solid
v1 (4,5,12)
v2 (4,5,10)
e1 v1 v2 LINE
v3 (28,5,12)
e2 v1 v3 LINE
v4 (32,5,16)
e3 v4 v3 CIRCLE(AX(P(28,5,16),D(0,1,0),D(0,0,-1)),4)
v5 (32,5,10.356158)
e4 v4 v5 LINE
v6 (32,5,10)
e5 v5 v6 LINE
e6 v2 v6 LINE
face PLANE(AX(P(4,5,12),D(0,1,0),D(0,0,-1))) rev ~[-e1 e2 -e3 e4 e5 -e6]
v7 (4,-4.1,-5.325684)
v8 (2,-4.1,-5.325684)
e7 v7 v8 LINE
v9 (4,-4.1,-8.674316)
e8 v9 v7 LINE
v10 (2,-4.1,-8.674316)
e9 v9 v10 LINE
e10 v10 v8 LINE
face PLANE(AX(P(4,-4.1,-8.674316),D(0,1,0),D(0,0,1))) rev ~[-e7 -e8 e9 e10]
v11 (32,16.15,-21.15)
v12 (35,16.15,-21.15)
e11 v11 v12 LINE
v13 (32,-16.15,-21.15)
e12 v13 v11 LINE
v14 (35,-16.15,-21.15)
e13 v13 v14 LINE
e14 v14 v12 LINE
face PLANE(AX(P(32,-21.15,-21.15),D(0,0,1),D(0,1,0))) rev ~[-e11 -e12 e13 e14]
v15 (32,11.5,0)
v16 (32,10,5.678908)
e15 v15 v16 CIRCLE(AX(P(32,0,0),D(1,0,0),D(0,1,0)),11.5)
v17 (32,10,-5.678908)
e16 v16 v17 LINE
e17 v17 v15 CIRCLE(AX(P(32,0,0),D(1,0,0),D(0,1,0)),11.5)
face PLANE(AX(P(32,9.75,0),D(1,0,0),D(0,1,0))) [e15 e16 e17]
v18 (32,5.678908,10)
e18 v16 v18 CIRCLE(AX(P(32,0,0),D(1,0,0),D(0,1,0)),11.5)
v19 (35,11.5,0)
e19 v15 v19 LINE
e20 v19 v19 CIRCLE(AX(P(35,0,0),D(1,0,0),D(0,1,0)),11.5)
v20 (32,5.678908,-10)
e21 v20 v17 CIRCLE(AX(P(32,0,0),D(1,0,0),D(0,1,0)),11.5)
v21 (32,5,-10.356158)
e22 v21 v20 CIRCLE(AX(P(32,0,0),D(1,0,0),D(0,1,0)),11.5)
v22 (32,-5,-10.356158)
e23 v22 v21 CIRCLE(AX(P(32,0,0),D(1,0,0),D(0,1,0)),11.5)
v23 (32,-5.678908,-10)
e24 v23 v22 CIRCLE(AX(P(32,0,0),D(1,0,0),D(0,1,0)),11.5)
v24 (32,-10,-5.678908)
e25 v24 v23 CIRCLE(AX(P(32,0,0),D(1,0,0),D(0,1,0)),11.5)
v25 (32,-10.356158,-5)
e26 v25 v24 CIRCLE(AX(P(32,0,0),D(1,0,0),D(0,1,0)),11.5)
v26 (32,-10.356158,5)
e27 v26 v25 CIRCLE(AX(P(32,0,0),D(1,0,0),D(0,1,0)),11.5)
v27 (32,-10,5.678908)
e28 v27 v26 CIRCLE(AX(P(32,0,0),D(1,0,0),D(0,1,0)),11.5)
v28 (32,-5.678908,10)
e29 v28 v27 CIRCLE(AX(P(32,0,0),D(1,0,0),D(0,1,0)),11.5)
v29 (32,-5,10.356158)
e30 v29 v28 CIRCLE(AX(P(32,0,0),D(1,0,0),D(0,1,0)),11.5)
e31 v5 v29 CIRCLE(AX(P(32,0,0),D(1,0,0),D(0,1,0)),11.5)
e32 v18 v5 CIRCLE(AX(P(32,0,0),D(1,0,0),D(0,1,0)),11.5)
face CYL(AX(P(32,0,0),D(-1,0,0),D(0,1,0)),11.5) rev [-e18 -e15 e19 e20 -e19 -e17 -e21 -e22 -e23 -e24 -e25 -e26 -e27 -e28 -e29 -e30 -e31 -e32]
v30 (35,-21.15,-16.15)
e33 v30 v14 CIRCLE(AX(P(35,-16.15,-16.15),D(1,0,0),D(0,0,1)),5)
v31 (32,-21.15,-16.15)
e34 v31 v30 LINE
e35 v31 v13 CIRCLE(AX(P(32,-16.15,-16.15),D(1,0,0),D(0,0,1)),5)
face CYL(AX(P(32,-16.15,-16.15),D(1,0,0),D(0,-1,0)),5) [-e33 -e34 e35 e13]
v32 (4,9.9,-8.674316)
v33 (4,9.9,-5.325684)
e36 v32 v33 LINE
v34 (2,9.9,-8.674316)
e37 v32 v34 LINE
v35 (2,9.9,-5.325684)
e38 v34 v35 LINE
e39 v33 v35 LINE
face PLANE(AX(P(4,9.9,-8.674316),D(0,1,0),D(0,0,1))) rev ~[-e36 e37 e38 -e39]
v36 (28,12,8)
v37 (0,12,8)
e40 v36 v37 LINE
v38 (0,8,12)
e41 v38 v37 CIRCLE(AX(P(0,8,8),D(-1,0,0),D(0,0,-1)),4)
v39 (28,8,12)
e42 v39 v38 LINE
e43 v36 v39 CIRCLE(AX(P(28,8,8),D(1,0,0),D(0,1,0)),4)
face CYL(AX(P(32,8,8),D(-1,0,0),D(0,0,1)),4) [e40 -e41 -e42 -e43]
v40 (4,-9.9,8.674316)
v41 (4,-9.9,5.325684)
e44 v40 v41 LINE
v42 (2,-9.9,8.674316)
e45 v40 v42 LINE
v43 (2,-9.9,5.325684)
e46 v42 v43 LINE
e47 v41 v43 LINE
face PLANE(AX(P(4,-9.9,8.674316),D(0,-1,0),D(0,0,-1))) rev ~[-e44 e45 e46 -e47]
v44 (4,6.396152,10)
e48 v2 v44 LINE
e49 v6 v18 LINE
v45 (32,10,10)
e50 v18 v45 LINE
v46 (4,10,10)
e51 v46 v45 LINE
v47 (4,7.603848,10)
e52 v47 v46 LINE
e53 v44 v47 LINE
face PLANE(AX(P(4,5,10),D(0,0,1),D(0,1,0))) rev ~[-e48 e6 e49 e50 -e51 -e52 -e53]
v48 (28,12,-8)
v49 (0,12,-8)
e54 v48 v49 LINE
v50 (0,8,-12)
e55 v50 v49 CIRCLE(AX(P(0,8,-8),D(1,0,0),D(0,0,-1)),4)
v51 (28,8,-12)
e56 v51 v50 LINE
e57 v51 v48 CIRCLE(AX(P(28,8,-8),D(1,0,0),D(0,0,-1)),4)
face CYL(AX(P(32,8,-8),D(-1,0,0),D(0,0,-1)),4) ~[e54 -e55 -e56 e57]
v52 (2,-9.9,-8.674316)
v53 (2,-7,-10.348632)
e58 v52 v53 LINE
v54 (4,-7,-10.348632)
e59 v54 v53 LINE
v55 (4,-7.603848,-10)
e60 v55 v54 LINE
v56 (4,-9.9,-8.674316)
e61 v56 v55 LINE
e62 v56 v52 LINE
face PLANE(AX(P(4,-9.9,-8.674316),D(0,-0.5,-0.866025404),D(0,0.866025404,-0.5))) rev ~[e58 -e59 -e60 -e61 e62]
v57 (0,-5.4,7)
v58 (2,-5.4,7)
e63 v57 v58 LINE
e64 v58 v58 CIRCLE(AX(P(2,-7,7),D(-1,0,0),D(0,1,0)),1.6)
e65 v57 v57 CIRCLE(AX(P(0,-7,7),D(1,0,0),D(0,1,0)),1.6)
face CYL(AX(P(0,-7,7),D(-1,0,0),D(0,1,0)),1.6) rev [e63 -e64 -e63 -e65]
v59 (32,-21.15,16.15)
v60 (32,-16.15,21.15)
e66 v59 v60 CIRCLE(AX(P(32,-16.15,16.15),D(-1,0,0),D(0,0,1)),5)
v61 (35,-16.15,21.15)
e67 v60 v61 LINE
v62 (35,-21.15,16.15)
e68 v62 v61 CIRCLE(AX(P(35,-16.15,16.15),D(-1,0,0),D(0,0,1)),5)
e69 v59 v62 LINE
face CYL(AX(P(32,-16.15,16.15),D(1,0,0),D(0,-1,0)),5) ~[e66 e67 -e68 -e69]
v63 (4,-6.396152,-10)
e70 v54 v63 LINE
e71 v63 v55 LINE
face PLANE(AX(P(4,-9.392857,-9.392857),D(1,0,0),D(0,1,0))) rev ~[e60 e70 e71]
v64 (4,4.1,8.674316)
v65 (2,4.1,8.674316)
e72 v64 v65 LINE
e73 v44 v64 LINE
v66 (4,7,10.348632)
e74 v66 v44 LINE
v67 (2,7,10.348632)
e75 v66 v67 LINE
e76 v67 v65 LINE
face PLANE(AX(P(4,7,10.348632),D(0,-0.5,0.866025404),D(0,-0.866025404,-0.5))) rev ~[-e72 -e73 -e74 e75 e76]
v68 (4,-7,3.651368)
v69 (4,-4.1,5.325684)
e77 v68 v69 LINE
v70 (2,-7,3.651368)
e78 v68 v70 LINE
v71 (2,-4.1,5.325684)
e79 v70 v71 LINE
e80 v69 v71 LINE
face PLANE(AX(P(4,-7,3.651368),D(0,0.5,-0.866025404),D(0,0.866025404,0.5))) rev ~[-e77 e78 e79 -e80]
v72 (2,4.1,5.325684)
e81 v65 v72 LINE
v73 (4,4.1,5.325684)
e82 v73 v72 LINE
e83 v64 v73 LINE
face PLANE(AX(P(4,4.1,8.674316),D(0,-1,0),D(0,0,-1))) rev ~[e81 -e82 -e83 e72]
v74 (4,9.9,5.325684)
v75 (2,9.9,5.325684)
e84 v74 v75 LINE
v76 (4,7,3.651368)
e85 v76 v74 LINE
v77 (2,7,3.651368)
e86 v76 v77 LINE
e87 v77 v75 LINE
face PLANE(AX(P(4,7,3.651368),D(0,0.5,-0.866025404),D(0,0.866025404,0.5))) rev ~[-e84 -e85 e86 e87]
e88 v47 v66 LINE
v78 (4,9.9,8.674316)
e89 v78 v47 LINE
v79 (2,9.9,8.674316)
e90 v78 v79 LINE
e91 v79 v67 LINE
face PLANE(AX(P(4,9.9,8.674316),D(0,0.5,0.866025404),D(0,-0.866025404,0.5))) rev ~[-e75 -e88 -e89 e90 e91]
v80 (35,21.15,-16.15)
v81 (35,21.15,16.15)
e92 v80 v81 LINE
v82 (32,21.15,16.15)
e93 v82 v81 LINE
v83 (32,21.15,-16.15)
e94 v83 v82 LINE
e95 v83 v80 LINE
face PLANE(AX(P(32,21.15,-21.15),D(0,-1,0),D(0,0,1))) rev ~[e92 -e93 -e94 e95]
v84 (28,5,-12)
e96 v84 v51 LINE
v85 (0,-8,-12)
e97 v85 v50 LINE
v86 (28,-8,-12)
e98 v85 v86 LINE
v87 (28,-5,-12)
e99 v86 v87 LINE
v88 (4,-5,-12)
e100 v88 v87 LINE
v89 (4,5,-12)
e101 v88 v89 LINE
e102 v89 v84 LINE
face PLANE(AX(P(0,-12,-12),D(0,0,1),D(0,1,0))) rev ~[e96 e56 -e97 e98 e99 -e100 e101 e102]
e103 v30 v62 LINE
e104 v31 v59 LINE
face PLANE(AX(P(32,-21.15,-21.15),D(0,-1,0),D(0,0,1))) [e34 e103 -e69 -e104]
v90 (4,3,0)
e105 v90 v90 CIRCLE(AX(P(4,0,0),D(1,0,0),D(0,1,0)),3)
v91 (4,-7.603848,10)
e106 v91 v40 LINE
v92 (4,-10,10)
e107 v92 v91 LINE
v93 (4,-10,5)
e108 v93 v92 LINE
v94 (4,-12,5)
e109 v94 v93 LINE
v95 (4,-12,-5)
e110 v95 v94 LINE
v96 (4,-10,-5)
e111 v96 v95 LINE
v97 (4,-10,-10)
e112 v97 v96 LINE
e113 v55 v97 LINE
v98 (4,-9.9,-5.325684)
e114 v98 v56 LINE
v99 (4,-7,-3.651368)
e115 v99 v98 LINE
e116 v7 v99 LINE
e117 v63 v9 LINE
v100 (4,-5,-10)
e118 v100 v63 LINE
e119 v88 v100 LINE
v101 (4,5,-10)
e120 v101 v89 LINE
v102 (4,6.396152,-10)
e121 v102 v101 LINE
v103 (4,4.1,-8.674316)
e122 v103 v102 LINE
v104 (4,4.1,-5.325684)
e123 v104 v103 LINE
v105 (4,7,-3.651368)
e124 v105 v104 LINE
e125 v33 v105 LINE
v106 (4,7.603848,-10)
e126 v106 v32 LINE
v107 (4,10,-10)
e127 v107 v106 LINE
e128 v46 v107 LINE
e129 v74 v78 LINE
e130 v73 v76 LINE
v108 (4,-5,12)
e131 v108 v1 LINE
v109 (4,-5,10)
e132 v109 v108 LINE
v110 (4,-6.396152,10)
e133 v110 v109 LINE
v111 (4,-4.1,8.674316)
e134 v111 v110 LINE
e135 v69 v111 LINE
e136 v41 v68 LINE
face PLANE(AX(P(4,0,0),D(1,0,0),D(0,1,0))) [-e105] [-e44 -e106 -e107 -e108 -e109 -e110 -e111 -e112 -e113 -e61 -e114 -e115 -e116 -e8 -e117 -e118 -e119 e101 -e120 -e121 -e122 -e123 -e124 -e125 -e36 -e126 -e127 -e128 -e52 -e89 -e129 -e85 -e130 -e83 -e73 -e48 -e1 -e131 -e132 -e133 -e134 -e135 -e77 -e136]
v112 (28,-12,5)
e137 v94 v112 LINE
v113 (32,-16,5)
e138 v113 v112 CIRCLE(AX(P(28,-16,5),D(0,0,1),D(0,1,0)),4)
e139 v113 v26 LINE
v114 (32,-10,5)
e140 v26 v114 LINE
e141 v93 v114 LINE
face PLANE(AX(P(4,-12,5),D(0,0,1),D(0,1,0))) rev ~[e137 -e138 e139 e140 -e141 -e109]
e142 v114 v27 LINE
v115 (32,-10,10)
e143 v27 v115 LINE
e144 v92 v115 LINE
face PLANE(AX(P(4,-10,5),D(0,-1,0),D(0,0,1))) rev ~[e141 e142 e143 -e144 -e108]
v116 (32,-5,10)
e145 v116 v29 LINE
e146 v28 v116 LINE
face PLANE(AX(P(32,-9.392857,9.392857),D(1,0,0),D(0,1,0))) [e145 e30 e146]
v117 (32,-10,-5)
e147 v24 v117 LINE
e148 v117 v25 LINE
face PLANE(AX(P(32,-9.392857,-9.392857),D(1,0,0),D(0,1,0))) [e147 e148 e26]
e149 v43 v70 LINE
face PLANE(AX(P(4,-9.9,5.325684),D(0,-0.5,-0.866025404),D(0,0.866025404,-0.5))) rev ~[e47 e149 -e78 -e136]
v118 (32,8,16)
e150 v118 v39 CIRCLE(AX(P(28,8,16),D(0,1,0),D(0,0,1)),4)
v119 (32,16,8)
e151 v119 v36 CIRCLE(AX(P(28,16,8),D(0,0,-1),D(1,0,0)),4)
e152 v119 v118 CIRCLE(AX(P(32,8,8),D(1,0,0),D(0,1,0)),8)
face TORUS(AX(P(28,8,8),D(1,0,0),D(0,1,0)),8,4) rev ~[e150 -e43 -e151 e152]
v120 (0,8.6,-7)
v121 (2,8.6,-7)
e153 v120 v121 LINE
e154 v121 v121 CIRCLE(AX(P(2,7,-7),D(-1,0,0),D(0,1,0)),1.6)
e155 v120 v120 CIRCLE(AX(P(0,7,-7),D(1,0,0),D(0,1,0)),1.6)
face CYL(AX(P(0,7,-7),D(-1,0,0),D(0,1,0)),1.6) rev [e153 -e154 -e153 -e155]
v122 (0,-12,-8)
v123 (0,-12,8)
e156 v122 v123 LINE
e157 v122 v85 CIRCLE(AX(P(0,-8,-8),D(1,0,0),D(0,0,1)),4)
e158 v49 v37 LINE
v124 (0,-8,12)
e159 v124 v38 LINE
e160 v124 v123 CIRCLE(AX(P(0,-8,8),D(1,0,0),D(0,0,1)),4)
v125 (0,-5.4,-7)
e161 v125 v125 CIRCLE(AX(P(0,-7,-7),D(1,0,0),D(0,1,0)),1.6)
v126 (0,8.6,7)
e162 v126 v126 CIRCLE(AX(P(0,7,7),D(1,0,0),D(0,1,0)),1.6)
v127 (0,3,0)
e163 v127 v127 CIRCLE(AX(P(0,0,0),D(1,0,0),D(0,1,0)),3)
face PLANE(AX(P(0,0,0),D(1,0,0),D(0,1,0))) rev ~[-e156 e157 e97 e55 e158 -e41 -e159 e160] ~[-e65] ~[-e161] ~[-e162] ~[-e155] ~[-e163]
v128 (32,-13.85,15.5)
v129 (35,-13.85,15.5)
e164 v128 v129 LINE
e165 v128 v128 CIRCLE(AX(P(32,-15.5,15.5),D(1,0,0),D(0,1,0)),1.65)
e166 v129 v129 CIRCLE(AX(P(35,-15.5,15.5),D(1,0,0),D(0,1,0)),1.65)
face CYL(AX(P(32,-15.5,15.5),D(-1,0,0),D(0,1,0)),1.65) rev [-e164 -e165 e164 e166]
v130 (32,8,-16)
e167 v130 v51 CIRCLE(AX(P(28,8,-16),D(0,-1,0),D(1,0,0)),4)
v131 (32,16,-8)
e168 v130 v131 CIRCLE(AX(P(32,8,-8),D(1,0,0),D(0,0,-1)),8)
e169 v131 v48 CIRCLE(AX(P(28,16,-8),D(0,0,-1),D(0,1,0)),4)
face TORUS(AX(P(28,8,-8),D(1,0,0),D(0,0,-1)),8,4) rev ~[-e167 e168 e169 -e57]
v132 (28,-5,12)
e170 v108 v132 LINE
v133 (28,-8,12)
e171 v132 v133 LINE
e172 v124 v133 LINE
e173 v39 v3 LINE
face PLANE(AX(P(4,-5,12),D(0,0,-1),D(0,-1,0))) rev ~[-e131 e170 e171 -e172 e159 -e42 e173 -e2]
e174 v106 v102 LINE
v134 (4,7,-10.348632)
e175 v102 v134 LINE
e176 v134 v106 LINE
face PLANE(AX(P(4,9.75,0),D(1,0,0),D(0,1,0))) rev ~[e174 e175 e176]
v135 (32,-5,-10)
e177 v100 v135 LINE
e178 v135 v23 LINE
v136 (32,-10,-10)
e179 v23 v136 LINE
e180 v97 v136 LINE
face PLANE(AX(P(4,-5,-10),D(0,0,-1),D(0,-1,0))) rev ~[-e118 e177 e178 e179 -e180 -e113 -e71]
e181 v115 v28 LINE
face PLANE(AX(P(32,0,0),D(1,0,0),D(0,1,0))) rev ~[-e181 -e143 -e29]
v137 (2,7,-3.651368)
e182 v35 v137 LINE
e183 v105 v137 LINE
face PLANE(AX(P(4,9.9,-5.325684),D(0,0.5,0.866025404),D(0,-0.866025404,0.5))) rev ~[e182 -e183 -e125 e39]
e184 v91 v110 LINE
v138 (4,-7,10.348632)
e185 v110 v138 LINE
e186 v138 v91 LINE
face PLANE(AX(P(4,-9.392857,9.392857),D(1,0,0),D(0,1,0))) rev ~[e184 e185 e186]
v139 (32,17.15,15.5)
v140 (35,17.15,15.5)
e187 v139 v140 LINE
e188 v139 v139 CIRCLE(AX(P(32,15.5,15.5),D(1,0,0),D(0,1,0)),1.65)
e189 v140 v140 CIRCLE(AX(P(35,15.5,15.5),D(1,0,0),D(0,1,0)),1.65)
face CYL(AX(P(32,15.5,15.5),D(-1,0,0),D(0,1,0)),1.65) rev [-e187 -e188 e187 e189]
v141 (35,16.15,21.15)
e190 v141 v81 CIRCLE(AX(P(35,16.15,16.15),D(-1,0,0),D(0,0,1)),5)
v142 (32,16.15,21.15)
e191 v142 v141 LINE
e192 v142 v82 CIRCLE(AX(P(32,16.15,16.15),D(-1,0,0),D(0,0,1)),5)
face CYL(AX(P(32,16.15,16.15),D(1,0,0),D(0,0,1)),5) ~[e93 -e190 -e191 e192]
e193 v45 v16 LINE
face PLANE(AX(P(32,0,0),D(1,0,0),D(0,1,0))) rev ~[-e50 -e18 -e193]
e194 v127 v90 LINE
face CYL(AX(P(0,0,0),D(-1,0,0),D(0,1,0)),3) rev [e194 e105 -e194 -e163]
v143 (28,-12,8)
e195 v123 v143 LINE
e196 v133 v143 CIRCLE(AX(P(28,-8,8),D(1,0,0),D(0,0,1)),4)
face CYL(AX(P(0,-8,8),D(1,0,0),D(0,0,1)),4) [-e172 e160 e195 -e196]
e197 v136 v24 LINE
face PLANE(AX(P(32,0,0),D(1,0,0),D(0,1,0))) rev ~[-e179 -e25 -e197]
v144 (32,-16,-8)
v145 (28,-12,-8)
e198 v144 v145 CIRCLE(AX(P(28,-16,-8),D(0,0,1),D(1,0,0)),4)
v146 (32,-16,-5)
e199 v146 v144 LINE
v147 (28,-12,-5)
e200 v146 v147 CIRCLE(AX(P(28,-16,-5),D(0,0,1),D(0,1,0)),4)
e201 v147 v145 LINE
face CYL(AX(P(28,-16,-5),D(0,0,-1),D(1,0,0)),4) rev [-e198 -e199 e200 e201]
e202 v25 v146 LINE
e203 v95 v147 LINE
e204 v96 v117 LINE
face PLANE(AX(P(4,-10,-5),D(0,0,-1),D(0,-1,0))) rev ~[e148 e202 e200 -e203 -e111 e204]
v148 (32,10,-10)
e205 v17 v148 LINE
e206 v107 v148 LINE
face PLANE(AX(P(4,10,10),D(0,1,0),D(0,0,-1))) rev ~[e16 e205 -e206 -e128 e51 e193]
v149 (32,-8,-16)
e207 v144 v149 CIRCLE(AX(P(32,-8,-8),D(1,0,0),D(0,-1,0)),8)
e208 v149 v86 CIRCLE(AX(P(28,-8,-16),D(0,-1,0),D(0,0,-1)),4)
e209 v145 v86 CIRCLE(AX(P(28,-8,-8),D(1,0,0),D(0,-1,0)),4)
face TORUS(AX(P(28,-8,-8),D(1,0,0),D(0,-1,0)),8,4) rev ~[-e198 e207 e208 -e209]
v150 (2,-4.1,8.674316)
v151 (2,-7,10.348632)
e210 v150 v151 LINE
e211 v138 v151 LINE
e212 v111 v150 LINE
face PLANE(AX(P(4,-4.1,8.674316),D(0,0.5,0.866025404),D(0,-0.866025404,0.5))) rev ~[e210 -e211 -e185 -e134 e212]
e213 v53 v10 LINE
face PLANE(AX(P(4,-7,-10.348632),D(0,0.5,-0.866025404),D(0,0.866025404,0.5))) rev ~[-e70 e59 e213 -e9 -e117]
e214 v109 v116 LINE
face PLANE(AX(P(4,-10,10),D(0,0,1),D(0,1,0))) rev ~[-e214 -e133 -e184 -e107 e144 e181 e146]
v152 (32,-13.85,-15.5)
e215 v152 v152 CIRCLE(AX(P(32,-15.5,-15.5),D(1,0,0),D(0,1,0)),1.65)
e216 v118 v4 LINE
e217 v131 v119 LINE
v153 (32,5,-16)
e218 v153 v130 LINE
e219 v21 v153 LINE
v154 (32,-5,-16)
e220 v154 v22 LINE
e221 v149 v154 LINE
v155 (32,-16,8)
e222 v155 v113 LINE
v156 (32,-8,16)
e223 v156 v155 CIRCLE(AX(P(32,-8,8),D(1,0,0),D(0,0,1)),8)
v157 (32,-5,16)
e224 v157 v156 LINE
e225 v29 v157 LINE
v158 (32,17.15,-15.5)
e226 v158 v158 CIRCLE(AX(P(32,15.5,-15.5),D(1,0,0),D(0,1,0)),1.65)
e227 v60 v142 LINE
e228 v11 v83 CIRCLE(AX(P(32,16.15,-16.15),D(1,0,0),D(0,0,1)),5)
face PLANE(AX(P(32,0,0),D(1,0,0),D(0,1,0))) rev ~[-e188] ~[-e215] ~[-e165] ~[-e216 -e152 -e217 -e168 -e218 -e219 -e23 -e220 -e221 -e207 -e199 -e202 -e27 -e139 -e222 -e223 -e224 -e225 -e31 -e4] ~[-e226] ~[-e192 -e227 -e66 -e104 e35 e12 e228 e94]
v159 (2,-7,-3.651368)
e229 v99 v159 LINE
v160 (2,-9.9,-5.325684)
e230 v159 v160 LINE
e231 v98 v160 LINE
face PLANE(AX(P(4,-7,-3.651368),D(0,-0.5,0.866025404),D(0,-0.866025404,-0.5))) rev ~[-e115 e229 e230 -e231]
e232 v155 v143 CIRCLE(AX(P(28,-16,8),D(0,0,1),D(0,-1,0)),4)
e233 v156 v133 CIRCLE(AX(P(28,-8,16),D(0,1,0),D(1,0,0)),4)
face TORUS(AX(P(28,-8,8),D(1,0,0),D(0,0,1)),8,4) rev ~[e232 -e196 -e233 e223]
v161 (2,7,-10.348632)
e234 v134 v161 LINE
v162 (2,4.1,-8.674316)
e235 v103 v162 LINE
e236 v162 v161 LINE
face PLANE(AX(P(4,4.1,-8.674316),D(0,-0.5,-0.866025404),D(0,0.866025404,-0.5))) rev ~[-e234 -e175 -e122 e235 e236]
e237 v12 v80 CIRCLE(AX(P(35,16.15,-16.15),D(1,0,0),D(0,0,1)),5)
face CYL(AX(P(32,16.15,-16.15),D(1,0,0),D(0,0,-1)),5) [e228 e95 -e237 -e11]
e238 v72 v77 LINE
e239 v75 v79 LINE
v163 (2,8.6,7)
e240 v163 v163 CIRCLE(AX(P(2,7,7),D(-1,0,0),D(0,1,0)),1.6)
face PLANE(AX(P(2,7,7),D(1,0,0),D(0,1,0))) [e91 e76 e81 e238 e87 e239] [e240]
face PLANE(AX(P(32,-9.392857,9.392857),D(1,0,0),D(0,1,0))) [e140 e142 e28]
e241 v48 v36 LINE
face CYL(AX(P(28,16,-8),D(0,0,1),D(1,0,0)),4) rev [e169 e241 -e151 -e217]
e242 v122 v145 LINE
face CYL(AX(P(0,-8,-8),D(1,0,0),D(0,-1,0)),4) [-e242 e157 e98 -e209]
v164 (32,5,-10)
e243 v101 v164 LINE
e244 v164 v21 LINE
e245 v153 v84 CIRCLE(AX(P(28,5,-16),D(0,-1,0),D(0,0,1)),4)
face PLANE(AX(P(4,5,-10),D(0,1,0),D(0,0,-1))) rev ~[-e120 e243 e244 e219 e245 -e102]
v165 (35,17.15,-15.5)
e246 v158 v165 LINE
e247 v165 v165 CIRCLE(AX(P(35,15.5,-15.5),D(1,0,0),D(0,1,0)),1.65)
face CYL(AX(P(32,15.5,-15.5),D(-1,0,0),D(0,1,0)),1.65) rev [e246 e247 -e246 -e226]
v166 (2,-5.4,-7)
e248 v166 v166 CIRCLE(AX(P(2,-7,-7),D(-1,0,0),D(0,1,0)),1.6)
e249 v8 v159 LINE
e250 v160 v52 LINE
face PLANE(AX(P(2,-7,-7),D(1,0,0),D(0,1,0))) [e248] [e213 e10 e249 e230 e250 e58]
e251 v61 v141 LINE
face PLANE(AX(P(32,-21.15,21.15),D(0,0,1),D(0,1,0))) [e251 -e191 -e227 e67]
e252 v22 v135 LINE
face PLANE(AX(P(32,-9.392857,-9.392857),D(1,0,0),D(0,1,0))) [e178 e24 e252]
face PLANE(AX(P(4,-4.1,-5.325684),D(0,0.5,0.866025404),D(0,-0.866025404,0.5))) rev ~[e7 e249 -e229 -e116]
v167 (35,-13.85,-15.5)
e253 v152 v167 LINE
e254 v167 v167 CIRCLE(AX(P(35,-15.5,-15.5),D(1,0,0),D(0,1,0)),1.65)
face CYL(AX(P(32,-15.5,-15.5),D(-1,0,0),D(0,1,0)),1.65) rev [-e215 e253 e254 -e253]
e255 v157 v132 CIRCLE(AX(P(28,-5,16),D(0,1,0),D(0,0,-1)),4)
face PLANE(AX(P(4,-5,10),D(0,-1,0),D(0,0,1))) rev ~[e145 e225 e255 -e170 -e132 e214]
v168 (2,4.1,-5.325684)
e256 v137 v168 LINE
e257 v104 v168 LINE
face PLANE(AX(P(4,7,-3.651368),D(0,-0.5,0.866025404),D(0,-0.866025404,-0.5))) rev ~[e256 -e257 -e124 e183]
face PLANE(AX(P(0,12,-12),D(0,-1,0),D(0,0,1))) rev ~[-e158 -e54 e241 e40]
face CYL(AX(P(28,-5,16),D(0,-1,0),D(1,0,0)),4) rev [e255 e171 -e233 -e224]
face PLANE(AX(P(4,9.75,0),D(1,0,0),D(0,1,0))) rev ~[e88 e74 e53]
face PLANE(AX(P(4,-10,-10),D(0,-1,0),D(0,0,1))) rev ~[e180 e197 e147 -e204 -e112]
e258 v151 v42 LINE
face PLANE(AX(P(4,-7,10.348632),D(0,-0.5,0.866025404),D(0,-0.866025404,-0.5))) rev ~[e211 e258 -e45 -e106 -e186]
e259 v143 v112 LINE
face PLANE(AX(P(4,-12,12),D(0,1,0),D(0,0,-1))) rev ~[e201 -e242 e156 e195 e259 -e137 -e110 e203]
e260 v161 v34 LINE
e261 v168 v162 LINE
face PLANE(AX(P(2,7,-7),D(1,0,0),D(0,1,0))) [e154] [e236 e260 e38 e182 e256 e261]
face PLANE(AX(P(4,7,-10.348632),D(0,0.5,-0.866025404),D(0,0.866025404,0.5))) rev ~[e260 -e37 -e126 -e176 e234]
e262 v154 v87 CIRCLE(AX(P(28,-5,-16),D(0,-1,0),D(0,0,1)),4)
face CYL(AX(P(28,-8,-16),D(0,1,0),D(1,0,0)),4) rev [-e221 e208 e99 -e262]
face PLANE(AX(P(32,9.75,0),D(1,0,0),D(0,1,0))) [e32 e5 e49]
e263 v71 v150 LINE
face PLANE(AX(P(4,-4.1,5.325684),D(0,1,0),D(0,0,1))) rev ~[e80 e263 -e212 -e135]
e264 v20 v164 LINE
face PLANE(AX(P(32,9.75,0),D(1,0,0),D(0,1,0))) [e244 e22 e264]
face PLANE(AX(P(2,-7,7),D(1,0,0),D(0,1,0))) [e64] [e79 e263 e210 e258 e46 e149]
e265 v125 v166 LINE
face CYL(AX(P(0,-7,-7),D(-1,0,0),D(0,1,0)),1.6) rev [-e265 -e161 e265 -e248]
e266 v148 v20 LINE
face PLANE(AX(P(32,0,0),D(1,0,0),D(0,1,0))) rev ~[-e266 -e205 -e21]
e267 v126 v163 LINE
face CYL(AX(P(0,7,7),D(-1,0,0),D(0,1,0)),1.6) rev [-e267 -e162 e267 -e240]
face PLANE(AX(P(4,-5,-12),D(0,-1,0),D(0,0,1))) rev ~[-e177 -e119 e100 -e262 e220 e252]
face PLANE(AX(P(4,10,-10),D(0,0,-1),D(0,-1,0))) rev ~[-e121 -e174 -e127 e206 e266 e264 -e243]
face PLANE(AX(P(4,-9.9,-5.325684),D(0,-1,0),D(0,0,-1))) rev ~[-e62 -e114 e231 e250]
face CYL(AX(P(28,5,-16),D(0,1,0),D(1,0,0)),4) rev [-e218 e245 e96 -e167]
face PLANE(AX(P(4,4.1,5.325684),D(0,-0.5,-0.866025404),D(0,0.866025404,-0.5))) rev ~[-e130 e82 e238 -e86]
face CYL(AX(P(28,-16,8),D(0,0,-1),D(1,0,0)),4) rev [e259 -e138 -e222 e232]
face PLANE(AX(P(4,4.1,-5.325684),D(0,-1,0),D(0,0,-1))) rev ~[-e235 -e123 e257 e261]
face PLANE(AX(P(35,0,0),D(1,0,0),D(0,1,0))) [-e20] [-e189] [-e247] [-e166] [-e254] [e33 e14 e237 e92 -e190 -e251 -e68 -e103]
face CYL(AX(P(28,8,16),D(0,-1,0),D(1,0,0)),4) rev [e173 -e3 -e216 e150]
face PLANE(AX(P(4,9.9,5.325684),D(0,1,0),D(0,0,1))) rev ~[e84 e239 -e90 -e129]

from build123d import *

# Parameters (mm, degrees)
F0_W     = 24
F0_H     = 24
F0_R     = 1.6
F0_R_2   = 3
F1_DEPTH = 4
F4_DEPTH = 2
F5_DEPTH = 28
F6_W     = 42.3
F6_H     = 42.3
F6_R     = 1.65
F6_R_2   = 11.5
F7_DEPTH = 3
F8_R     = 5
F9_F1_R  = 4
F9_F2_R  = 4


with BuildPart() as f1:
    # F0 (on Right) → F1 (new body)
    with BuildSketch(Plane.YZ):
        Rectangle(F0_W, F0_H)
        with Locations((-7, -7)):
            Circle(F0_R, mode=Mode.SUBTRACT)
        with Locations((7, -7)):
            Circle(F0_R, mode=Mode.SUBTRACT)
        with Locations((-7, 7)):
            Circle(F0_R, mode=Mode.SUBTRACT)
        Circle(F0_R_2, mode=Mode.SUBTRACT)
        with Locations((7, 7)):
            Circle(F0_R, mode=Mode.SUBTRACT)
    extrude(amount=F1_DEPTH)

    # F2 (on face) → F4 (cut)
    with BuildSketch(Plane.YZ.offset(4)):
        Polygon((7, -3.6513684387), (4.1, -5.3256842194), (4.1, -8.6743157806), (7, -10.3486315613), (9.9, -8.6743157806), (9.9, -5.3256842194), align=None)
        Polygon((4.1, 5.3256842194), (7, 3.6513684387), (9.9, 5.3256842194), (9.9, 8.6743157806), (7, 10.3486315613), (4.1, 8.6743157806), align=None)
        Polygon((-9.9, 5.3256842194), (-7, 3.6513684387), (-4.1, 5.3256842194), (-4.1, 8.6743157806), (-7, 10.3486315613), (-9.9, 8.6743157806), align=None)
        Polygon((-4.1, -5.3256842194), (-7, -3.6513684387), (-9.9, -5.3256842194), (-9.9, -8.6743157806), (-7, -10.3486315613), (-4.1, -8.6743157806), align=None)
    extrude(amount=-F4_DEPTH, mode=Mode.SUBTRACT)

    # F3 (on face) → F5 (join)
    with BuildSketch(Plane.YZ.offset(4)):
        Polygon((-5, 12), (-12, 12), (-12, 5), (-10, 5), (-10, 10), (-5, 10), align=None)
        Polygon((12, 12), (5, 12), (5, 10), (10, 10), (10, -10), (5, -10), (5, -12), (12, -12), align=None)
        Polygon((-10, -5), (-12, -5), (-12, -12), (-5, -12), (-5, -10), (-10, -10), align=None)
    extrude(amount=F5_DEPTH)

    # F6 (on face) → F7 (join)
    with BuildSketch(Plane.YZ.offset(32)):
        Rectangle(F6_W, F6_H)
        with Locations((-15.5, -15.5)):
            Circle(F6_R, mode=Mode.SUBTRACT)
        with Locations((15.5, -15.5)):
            Circle(F6_R, mode=Mode.SUBTRACT)
        with Locations((-15.5, 15.5)):
            Circle(F6_R, mode=Mode.SUBTRACT)
        Circle(F6_R_2, mode=Mode.SUBTRACT)
        with Locations((15.5, 15.5)):
            Circle(F6_R, mode=Mode.SUBTRACT)
    extrude(amount=F7_DEPTH)

    # F8
    f8_edges = [f1.edges().sort_by_distance(p)[0] for p in [
        (33.5, 21.15, 21.15),
        (33.5, 21.15, -21.15),
        (33.5, -21.15, -21.15),
        (33.5, -21.15, 21.15),
    ]]
    fillet(f8_edges, radius=F8_R)

    # F9: fillet of radius 4 on 7 edges, made by hand

    # F9_f1
    f9_f1_edges = [f1.edges().sort_by_distance(p)[0] for p in [
        (16, 12, 12),
        (16, 12, -12),
        (16, -12, -12),
        (16, -12, 12),
    ]]
    fillet(f9_f1_edges, radius=F9_F1_R)

    # F9_f2
    f9_f2_edges = [f1.edges().sort_by_distance(p)[0] for p in [
        (32, 12, 0),
        (32, -6.5, -12),
        (32, -12, 6.5),
        (32, -10.8284271247, 10.8284271247),
        (32, -10.8284271247, -10.8284271247),
        (32, 10.8284271247, -10.8284271247),
        (32, 10.8284271247, 10.8284271247),
    ]]
    fillet(f9_f2_edges, radius=F9_F2_R)


solid = f1.part
